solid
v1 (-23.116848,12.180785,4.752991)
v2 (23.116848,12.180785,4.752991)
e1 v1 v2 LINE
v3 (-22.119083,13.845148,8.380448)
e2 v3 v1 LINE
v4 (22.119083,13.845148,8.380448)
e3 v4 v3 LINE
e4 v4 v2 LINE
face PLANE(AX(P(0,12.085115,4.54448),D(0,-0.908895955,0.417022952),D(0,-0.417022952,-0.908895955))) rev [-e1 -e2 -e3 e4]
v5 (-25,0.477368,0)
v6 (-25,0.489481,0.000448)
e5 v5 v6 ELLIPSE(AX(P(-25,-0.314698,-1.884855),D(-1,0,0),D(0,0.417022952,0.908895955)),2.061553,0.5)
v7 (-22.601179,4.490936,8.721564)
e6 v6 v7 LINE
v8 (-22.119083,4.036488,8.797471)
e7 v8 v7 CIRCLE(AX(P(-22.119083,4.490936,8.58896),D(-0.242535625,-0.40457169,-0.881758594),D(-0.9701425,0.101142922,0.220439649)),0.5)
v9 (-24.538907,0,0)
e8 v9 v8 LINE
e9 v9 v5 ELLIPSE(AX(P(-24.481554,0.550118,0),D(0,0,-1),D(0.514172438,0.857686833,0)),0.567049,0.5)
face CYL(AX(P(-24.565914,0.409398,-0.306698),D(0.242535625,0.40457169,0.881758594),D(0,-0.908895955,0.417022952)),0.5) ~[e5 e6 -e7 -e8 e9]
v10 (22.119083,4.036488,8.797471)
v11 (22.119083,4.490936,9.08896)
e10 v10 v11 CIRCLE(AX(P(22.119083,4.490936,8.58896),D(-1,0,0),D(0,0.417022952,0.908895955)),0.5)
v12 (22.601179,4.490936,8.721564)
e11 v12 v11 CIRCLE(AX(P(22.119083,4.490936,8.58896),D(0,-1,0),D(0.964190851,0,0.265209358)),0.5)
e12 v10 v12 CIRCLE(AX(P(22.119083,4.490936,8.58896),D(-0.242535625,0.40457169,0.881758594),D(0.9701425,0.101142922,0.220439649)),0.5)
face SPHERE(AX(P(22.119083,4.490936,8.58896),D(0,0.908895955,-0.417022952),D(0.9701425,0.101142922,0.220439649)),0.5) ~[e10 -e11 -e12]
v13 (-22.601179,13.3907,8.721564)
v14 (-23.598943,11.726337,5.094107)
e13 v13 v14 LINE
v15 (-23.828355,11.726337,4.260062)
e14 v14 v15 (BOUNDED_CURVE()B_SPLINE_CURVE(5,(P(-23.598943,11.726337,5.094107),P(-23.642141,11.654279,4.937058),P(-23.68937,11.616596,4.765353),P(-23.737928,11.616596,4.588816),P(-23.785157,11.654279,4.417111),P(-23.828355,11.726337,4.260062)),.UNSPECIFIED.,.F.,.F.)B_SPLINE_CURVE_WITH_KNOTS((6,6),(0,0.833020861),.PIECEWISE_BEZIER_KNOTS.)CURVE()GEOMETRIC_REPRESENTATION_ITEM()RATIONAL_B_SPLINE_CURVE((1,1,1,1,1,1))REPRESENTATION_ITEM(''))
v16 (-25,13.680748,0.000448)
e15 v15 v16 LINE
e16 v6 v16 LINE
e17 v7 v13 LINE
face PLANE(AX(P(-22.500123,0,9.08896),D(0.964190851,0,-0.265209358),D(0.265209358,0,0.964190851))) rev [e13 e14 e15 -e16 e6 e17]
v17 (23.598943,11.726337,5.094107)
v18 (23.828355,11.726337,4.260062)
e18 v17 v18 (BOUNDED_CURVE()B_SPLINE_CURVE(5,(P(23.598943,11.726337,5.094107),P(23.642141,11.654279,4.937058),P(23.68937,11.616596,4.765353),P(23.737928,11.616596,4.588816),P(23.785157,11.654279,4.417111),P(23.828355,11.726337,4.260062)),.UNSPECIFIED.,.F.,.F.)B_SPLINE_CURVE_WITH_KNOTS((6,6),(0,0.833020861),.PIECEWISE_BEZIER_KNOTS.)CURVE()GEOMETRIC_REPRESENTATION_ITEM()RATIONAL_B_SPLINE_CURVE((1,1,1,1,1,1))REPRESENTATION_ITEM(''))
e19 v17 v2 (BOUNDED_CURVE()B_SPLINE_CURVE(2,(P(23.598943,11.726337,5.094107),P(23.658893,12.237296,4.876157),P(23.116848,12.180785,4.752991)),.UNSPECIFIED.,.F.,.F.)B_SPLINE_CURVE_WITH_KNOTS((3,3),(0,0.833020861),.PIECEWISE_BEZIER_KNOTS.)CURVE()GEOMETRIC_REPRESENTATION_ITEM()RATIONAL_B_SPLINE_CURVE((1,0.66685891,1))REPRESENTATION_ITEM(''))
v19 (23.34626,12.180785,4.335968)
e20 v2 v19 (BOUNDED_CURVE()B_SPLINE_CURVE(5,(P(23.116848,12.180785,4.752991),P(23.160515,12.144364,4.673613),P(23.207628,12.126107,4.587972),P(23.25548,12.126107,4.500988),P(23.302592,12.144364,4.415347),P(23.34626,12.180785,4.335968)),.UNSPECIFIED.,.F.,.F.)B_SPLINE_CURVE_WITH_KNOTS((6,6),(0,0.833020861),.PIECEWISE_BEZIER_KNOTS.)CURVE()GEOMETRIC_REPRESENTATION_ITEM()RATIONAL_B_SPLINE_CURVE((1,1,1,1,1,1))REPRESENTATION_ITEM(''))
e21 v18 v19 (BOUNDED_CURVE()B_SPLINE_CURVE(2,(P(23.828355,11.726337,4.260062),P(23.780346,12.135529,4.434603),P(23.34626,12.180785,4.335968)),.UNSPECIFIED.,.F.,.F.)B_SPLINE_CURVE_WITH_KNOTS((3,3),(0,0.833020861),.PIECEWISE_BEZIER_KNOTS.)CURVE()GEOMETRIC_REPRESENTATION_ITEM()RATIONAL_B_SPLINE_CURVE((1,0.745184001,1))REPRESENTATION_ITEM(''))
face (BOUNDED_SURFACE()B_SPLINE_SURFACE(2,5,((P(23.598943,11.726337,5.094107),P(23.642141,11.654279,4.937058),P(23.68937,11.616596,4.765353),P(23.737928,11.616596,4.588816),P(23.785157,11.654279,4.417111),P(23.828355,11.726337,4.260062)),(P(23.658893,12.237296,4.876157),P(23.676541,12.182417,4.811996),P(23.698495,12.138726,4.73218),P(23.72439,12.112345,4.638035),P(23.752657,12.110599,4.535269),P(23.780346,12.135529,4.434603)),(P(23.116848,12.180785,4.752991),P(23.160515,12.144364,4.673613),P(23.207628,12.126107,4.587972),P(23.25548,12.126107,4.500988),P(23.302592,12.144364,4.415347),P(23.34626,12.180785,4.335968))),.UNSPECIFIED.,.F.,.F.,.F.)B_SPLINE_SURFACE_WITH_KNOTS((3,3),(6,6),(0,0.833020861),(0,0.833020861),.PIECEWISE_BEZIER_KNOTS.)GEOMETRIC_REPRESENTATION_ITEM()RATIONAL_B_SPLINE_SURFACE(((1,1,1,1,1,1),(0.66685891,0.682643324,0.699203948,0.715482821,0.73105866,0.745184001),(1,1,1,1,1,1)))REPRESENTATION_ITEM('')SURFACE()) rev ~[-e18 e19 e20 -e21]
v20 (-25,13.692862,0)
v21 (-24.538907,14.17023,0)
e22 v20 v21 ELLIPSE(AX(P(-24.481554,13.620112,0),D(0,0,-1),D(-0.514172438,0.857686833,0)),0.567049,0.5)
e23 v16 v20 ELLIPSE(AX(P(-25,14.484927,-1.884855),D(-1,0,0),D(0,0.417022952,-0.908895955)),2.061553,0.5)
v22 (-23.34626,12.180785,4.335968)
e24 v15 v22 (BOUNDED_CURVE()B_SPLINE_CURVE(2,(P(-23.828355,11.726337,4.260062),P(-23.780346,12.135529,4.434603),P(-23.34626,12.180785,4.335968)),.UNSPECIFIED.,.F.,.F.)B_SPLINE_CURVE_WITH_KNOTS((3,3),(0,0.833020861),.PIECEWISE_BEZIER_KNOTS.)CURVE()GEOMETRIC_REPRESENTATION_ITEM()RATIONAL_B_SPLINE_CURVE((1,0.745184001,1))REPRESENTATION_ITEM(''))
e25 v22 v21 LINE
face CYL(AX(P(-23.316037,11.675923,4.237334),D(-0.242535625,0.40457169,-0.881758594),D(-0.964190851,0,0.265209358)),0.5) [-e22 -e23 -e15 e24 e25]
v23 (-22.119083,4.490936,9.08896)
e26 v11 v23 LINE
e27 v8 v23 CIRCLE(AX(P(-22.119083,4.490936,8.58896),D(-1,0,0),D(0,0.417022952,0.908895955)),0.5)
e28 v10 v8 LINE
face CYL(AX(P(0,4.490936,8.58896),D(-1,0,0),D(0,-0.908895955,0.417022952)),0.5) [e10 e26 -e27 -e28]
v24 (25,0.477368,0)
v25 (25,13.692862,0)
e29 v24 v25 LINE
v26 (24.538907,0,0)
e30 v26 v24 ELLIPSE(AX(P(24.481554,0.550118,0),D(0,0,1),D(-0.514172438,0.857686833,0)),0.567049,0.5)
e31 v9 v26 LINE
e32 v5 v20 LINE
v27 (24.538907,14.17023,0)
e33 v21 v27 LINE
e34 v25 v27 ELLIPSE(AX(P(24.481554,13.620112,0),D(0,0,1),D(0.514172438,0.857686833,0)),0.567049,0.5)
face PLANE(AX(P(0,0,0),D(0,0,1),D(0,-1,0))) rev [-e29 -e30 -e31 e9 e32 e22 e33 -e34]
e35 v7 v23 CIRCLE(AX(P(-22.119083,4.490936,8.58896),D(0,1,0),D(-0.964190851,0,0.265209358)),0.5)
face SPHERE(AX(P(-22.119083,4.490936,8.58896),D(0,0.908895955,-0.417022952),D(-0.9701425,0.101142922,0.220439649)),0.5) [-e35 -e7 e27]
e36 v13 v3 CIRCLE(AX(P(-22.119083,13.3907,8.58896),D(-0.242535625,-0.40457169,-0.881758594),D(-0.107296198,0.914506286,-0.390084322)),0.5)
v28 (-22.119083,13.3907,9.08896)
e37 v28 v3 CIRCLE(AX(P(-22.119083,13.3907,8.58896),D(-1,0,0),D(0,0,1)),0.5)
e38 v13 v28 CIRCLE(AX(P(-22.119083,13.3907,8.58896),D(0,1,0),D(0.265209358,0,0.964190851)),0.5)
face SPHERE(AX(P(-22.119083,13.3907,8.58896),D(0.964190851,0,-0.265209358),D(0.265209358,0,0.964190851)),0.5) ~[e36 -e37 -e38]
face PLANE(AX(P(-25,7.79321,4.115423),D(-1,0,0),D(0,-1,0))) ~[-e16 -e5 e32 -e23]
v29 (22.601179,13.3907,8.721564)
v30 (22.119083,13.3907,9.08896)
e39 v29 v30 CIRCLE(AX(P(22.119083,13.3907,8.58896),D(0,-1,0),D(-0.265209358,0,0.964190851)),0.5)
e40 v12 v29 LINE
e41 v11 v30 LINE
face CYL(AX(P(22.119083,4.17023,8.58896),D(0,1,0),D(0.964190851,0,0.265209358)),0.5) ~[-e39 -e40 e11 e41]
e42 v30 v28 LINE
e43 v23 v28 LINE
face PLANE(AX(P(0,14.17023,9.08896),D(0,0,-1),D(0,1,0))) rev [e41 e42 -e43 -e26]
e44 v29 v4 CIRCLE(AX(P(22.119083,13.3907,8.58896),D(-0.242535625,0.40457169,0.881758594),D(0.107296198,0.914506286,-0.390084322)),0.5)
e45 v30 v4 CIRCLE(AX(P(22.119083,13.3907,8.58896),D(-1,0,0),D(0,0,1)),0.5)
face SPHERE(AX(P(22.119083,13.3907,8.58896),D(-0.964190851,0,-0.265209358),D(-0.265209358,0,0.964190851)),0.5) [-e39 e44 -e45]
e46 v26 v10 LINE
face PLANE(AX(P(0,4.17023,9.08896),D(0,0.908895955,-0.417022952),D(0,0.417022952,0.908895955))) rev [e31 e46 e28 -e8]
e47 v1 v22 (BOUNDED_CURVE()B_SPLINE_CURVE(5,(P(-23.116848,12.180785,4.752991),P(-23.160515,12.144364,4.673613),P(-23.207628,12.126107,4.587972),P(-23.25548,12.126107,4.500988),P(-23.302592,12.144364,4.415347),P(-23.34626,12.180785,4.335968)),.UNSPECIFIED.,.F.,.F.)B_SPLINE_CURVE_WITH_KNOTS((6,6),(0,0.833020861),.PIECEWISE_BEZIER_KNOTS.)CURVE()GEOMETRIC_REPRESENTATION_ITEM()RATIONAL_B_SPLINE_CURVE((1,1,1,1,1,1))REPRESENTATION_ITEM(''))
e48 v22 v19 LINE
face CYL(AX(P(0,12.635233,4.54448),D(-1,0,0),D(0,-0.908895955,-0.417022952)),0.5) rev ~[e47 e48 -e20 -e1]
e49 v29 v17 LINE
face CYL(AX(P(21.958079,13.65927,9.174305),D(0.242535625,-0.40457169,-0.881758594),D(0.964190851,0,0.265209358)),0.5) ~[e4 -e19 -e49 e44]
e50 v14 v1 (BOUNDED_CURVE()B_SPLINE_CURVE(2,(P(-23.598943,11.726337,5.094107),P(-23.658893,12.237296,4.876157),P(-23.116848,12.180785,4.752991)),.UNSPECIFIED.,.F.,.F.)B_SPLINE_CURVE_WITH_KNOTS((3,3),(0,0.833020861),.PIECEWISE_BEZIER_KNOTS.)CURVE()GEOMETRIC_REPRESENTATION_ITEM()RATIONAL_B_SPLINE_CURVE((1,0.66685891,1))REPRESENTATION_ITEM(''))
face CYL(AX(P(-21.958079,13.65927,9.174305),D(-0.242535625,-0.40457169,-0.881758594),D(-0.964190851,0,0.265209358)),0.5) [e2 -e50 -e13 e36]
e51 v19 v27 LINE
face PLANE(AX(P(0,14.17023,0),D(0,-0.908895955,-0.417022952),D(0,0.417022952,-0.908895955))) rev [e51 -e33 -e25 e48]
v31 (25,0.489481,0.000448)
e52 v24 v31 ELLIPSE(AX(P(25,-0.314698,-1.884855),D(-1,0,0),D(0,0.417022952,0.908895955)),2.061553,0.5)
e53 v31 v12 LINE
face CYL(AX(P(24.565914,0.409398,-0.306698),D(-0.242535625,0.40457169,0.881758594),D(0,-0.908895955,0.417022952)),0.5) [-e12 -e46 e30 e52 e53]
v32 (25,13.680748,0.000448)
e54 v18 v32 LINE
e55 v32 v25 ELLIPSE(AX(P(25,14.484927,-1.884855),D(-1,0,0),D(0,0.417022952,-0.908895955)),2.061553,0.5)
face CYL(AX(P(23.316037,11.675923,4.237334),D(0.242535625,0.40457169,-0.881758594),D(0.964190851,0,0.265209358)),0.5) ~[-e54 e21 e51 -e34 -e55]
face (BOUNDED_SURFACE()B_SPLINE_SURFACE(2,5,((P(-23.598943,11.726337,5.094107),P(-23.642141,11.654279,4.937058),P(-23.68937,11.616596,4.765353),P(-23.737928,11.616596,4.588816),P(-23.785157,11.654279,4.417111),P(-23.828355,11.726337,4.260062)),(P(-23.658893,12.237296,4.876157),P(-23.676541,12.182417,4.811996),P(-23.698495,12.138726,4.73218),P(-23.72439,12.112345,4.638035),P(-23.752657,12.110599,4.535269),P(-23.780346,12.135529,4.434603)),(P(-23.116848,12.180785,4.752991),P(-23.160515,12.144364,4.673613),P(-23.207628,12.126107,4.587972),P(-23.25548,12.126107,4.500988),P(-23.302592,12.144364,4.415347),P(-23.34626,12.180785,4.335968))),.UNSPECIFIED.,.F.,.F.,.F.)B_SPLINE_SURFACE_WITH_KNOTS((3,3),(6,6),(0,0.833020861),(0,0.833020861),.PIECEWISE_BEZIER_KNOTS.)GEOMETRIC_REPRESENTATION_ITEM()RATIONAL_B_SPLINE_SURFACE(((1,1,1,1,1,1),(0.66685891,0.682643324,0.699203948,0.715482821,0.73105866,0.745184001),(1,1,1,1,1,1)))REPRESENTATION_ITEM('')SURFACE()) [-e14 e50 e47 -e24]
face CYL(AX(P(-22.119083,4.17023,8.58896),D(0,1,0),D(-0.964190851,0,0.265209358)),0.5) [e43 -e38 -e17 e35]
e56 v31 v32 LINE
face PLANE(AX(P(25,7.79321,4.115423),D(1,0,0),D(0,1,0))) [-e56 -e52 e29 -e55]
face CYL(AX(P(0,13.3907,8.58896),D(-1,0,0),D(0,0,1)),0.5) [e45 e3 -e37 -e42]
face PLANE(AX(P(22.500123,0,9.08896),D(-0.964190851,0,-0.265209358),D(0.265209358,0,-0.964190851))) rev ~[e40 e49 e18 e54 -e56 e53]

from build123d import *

# Parameters (mm, degrees)
F1_DEPTH = 25
F3_DEPTH = 14.1712295243
F4_R     = 0.5


with BuildPart() as f1:
    # F0 (on Right) → F1 (new body)
    with BuildSketch(Plane.YZ):
        Polygon((4.1702295243, 9.0889595507), (0, 0), (14.1702295243, 0), (12.0851147622, 4.5444797754), (14.1702295243, 9.0889595507), align=None)
    extrude(amount=F1_DEPTH)

    # F2 (on Front) → F3 (cut, through all)
    with BuildSketch(Plane.XZ):
        Polygon((22.5001233071, 9.0889595507), (25.0001233071, 0), (25.0001233071, 9.0889595507), align=None)
    extrude(amount=-F3_DEPTH, mode=Mode.SUBTRACT)

    # F4
    f4_edges = [f1.edges().sort_by_distance(p)[0] for p in [
        (11.250062, 14.17023, 9.08896),
        (11.875062, 12.085115, 4.54448),
        (22.500123, 9.17023, 9.08896),
        (23.125123, 13.127672, 6.81672),
        (23.750062, 2.085218, 4.544704),
        (11.250062, 4.17023, 9.08896),
        (24.375062, 13.127569, 2.272464),
    ]]
    fillet(f4_edges, radius=F4_R)

    # F5: F1 across face


with BuildPart() as f1_1:
    add(f1.part)
    add(f1.part.mirror(Plane(origin=(0, 7.5492536206, 4.2511231401), x_dir=(0, 1, 0), z_dir=(-1, 0, 0))))


solid = f1_1.part
